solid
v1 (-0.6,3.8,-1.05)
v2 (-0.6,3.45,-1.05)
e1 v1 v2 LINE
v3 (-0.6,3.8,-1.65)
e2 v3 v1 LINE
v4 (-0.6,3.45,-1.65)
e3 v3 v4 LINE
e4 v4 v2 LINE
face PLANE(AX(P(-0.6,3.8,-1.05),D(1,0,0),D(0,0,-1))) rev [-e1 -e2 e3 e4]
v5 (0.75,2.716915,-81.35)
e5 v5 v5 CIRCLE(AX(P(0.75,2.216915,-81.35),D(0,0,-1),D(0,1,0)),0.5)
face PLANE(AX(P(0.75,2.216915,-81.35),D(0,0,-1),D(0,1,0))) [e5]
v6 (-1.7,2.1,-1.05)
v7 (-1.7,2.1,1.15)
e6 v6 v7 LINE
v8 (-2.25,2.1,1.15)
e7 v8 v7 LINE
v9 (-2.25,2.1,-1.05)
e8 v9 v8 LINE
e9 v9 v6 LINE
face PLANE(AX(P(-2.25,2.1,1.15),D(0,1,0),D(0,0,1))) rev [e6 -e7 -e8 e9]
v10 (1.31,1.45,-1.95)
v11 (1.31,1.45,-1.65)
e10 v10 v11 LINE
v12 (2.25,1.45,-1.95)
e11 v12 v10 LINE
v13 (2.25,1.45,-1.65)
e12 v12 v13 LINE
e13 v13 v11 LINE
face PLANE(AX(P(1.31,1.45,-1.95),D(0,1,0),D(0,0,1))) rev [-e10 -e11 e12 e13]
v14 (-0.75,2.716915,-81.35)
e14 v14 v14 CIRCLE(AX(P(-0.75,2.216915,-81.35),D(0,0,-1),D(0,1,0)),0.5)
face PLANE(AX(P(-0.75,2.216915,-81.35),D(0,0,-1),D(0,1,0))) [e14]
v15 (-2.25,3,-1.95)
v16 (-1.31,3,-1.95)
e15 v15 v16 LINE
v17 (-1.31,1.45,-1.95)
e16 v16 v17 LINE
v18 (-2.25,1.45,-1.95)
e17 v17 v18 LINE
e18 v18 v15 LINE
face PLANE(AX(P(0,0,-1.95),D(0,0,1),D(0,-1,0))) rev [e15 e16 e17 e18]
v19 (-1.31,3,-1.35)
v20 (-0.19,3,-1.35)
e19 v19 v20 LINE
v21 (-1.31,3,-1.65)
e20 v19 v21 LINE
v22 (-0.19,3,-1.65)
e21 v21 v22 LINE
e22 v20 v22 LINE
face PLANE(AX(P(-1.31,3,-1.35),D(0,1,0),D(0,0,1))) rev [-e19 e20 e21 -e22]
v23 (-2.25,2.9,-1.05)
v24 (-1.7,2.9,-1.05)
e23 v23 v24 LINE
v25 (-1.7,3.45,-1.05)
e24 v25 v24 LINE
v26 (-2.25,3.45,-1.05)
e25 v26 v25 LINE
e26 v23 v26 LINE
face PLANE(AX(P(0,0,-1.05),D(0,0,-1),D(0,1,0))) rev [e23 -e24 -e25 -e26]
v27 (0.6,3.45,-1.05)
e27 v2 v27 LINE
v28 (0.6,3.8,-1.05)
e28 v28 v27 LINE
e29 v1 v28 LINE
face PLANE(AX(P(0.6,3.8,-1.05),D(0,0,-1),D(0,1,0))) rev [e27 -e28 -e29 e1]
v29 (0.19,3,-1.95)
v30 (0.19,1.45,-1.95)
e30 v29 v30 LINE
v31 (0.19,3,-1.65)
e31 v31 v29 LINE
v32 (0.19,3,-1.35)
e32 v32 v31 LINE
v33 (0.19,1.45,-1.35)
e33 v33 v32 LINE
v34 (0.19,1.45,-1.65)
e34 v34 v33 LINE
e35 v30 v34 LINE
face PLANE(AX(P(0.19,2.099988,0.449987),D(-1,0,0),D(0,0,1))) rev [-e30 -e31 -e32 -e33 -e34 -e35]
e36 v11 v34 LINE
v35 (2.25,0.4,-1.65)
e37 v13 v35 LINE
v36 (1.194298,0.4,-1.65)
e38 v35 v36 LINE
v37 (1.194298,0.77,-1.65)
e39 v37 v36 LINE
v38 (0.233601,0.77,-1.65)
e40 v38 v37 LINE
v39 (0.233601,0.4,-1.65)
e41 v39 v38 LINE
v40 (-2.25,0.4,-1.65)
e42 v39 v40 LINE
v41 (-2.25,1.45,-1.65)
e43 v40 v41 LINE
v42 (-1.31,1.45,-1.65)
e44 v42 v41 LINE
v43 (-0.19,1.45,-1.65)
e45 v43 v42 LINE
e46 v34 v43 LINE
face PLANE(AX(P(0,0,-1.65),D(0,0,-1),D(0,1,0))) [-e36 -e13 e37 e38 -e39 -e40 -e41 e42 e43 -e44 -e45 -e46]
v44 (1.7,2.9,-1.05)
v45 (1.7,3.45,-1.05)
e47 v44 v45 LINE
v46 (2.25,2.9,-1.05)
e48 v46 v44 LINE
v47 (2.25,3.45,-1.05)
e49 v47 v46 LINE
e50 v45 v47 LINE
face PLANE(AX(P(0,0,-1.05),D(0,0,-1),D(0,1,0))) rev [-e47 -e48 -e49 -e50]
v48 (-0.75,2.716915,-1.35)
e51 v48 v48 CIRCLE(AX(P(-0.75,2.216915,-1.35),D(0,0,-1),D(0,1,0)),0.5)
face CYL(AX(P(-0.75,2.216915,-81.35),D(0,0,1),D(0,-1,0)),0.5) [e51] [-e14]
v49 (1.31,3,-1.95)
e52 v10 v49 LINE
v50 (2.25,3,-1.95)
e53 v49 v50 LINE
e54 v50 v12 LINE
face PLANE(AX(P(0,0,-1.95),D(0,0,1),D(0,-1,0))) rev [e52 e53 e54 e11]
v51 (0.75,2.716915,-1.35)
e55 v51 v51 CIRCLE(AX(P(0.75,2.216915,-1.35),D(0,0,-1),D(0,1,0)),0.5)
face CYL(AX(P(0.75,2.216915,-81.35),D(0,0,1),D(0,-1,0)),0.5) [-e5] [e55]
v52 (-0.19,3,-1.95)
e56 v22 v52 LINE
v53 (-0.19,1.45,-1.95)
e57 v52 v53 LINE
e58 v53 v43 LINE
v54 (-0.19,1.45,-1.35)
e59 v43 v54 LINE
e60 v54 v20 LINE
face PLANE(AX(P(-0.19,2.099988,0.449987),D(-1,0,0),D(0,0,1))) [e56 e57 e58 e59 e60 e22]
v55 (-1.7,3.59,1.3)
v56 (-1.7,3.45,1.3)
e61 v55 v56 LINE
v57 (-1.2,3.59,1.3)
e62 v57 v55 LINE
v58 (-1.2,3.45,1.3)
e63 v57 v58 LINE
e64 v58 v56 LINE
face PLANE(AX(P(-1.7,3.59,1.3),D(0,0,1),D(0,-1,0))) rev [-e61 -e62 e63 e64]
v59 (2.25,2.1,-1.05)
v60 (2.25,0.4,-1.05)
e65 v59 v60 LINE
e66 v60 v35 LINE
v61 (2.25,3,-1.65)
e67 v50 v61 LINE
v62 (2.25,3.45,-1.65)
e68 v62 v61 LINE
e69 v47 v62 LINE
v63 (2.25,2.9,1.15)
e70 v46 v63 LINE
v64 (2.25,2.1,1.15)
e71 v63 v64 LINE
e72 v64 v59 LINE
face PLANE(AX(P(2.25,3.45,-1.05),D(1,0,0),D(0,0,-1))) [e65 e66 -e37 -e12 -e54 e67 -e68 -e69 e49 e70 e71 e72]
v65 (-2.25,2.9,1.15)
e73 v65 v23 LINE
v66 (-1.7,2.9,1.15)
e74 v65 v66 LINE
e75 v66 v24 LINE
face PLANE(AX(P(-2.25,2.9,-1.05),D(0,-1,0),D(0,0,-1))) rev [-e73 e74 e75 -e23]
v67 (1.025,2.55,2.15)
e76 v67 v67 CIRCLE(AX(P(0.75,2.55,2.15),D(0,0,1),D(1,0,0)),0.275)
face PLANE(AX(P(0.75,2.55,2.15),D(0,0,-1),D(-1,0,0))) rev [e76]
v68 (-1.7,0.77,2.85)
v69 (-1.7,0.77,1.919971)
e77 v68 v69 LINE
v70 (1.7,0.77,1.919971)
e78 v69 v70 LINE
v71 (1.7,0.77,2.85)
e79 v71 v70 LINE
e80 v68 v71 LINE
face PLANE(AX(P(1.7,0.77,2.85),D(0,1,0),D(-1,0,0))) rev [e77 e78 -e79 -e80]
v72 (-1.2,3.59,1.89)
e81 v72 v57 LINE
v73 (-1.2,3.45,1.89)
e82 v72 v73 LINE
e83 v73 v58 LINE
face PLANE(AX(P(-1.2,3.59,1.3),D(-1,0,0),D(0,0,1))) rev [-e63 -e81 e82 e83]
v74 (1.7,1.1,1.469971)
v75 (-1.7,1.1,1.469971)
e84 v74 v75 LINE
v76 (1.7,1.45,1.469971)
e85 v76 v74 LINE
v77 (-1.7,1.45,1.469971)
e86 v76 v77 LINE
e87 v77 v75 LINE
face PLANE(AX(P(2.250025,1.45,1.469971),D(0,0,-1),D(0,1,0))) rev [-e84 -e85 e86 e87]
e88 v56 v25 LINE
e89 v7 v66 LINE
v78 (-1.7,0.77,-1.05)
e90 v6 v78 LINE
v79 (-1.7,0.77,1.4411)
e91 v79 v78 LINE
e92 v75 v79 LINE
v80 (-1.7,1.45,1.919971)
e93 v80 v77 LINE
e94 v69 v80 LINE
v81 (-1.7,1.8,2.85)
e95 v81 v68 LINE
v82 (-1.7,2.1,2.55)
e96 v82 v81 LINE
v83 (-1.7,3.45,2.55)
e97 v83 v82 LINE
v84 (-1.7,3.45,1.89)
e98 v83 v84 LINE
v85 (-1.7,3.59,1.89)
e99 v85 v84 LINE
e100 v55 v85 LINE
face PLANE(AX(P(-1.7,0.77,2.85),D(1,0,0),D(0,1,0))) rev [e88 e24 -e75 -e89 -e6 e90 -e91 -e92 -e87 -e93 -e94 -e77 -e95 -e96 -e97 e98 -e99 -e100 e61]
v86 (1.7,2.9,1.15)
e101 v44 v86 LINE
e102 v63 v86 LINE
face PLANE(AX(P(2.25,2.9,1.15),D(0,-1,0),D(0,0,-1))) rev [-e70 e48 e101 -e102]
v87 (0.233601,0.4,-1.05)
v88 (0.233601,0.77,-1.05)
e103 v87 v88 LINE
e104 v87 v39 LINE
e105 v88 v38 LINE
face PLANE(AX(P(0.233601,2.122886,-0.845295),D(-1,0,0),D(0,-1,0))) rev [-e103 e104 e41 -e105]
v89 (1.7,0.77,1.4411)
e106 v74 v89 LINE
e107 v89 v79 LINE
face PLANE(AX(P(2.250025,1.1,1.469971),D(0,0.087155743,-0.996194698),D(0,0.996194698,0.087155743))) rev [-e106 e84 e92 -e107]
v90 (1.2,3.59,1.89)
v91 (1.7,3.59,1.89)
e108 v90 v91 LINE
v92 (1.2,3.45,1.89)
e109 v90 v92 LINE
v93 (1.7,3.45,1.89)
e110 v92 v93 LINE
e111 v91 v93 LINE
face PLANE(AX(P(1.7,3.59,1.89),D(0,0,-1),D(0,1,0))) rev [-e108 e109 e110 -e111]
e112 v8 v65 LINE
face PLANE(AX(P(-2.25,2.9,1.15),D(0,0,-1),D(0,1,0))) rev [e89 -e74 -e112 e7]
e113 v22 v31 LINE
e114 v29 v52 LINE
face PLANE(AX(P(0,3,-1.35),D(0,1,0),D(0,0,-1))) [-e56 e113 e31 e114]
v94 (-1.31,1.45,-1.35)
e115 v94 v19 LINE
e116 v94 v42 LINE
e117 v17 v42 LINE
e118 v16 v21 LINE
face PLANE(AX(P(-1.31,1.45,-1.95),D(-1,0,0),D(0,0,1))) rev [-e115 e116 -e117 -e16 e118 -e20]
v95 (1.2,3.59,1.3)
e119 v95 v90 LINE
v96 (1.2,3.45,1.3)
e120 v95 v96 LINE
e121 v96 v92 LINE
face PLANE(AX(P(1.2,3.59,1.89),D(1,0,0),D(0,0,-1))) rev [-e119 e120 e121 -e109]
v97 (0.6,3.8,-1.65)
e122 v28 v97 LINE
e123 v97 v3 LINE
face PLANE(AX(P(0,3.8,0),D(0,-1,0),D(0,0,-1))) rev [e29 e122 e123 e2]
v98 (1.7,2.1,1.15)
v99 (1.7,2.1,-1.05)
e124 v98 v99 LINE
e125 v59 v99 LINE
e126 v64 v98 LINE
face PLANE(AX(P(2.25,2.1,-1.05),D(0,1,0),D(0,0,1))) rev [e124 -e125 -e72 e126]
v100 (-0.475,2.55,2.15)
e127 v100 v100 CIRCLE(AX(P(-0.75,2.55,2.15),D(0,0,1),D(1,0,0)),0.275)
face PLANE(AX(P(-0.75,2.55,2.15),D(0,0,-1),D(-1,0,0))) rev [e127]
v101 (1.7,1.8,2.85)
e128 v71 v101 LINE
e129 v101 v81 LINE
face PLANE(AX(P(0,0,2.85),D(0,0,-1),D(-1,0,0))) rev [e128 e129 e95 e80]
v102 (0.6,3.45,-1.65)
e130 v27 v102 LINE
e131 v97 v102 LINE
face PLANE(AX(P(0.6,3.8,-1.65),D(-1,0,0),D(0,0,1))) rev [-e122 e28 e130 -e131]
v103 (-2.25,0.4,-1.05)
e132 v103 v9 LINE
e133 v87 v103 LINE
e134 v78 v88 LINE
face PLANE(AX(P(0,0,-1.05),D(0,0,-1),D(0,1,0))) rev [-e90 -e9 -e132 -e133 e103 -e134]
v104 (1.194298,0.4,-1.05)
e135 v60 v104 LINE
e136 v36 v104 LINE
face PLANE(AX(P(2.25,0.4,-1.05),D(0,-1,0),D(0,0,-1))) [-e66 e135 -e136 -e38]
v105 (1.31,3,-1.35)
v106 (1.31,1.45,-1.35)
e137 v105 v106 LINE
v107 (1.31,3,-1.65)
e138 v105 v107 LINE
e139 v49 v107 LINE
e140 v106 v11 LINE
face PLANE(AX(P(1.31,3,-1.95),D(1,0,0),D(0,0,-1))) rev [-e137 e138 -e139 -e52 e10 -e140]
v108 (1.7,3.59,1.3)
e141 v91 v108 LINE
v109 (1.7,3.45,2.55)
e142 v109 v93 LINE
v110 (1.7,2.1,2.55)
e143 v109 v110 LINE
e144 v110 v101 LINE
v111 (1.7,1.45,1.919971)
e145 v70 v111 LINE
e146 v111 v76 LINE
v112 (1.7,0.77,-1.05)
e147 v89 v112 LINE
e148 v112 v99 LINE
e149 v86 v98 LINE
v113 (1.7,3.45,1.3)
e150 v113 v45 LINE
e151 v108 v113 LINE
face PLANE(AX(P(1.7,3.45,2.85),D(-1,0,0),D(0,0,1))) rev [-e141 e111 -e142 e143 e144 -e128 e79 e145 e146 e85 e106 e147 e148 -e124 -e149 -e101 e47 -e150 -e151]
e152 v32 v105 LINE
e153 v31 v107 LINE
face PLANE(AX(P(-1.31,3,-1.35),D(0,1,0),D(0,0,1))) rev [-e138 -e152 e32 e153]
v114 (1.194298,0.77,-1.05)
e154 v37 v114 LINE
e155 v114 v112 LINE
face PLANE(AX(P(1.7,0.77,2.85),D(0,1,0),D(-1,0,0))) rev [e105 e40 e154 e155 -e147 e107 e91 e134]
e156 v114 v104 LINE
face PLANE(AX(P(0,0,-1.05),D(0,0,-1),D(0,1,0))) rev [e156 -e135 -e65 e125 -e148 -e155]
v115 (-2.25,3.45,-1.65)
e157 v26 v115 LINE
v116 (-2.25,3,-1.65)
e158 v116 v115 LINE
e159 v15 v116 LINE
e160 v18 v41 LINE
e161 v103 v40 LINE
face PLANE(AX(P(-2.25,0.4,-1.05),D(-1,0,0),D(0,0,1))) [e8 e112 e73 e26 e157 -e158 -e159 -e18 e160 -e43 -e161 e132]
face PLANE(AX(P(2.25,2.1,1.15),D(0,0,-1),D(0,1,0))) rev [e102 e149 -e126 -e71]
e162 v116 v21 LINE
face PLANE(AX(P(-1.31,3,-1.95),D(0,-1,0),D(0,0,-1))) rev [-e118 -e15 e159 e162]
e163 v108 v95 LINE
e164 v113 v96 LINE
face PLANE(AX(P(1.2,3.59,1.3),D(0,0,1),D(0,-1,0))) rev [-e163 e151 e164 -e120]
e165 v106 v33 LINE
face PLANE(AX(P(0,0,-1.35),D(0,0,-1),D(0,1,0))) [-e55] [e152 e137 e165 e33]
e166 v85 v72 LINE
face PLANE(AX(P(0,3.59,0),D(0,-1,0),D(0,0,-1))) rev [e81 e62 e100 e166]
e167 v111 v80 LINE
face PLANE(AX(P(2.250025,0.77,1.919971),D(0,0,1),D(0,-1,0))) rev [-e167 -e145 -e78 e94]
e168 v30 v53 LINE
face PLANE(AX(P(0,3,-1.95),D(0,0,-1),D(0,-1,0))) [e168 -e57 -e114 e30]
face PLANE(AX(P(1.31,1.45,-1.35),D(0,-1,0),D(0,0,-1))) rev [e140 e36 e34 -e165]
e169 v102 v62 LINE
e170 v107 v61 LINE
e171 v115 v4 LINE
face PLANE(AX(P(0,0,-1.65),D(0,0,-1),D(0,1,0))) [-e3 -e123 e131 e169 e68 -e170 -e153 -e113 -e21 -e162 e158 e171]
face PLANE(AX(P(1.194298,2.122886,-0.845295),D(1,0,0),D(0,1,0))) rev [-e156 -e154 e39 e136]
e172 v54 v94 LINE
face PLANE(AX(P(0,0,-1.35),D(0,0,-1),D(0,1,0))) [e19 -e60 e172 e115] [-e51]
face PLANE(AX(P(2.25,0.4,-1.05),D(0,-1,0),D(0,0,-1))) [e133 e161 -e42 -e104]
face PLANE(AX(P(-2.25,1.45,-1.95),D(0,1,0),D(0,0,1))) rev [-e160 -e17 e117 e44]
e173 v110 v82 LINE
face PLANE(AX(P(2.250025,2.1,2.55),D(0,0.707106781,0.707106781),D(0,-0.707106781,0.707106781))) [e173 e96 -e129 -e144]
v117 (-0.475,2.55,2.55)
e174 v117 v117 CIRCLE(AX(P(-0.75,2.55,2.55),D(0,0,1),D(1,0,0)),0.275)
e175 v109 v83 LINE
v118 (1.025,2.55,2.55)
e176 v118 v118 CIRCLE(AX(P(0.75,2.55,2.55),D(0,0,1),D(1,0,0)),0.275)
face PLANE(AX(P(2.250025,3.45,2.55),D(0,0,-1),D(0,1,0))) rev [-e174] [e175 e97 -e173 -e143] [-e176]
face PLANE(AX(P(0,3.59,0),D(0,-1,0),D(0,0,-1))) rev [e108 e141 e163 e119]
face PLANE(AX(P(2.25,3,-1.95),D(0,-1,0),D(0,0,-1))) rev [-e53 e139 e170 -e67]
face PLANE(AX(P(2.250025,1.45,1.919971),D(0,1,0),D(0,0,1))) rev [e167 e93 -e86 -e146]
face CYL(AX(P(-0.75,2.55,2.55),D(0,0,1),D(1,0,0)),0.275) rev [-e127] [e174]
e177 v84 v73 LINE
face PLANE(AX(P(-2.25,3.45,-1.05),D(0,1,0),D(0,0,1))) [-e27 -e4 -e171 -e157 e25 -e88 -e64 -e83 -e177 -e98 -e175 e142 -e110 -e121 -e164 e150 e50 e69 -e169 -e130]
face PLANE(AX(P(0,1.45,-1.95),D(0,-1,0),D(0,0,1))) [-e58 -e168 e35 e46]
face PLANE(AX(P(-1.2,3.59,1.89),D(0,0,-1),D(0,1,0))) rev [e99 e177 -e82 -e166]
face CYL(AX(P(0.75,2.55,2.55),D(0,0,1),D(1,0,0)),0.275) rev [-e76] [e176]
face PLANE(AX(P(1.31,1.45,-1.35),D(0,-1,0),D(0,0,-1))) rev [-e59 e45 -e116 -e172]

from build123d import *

# Parameters (mm, degrees)
SKETCH1_W                        = 4.5
SKETCH1_H                        = 3.05
BOSS_EXTRUDE1_DEPTH              = 0.6
SKETCH2_W                        = 0.94
SKETCH2_H                        = 1.55
BOSS_EXTRUDE2_DEPTH              = 0.3
SKETCH3_W                        = 0.94
SKETCH3_H                        = 1.55
BOSS_EXTRUDE3_DEPTH              = 0.3
SKETCH4_W                        = 2.62
SKETCH4_H                        = 1.55
CUT_EXTRUDE1_DEPTH               = 0.3
SKETCH5_W                        = 3.4
SKETCH5_H                        = 2.68
BOSS_EXTRUDE4_DEPTH              = 3.9
SKETCH6_W                        = 2.2
SKETCH6_H                        = 0.8
BOSS_EXTRUDE5_DEPTH              = 0.55
SKETCH7_W                        = 2.2
SKETCH7_H                        = 0.8
BOSS_EXTRUDE6_DEPTH              = 0.55
SKETCH8_W                        = 0.3
SKETCH8_H                        = 1.35
CUT_EXTRUDE2_DEPTH               = 6.968877616
CUT_EXTRUDE3_DEPTH               = 6.968877616
SKETCH10_W                       = 0.5
SKETCH10_H                       = 0.59
BOSS_EXTRUDE7_DEPTH              = 0.14
SKETCH11_W                       = 1.2
SKETCH11_H                       = 0.6
BOSS_EXTRUDE8_DEPTH              = 0.35
SKETCH12_W                       = 0.5
SKETCH12_H                       = 0.59
BOSS_EXTRUDE9_DEPTH              = 0.14
DRAFT1_ANGLE                     = 45
F_0_55_0_55_DIAMETER_HOLE1_D     = 0.55
F_0_55_0_55_DIAMETER_HOLE1_DEPTH = 0.4
RIB1_START                       = -0.19
RIB1_OUTLINE_W                   = 1.55
RIB1_OUTLINE_H                   = 0.6
RIB1_DEPTH                       = 0.38
SKETCH16_R                       = 0.5
BOSS_EXTRUDE10_DEPTH             = 80
SKETCH17_W                       = 0.960697218
SKETCH17_H                       = 0.952555717
CUT_EXTRUDE4_DEPTH               = 0.37


# Read off the part's stored shape, not the designer's step: Rib1
with BuildPart() as part:
    # Sketch1 → Boss-Extrude1 (new body)
    with BuildSketch(Plane(origin=(0, 0, -1.65), x_dir=(-1, 0, 0), z_dir=(0, 0, -1))):
        with Locations((0, 1.925)):
            Rectangle(SKETCH1_W, SKETCH1_H)
    extrude(amount=-BOSS_EXTRUDE1_DEPTH)

    # Sketch2 → Boss-Extrude2 (add)
    with BuildSketch(Plane(origin=(0, 0, -1.65), x_dir=(-1, 0, 0), z_dir=(0, 0, -1))):
        with Locations((1.78, 2.225)):
            Rectangle(SKETCH2_W, SKETCH2_H)
    extrude(amount=BOSS_EXTRUDE2_DEPTH)

    # Sketch3 → Boss-Extrude3 (add)
    with BuildSketch(Plane(origin=(0, 0, -1.65), x_dir=(-1, 0, 0), z_dir=(0, 0, -1))):
        with Locations((-1.78, 2.225)):
            Rectangle(SKETCH3_W, SKETCH3_H)
    extrude(amount=BOSS_EXTRUDE3_DEPTH)

    # Sketch4 → Cut-Extrude1 (cut)
    with BuildSketch(Plane(origin=(0, 0, -1.65), x_dir=(-1, 0, 0), z_dir=(0, 0, -1))):
        with Locations((0, 2.225)):
            Rectangle(SKETCH4_W, SKETCH4_H)
    extrude(amount=-CUT_EXTRUDE1_DEPTH, mode=Mode.SUBTRACT)

    # Sketch5 → Boss-Extrude4 (add)
    with BuildSketch(Plane.XY.offset(-1.05)):
        with Locations((0, 2.11)):
            Rectangle(SKETCH5_W, SKETCH5_H)
    extrude(amount=BOSS_EXTRUDE4_DEPTH)

    # Sketch6 → Boss-Extrude5 (add)
    with BuildSketch(Plane(origin=(1.7, 0, 0), x_dir=(0, 0, -1), z_dir=(1, 0, 0))):
        with Locations((-0.05, 2.5)):
            Rectangle(SKETCH6_W, SKETCH6_H)
    extrude(amount=BOSS_EXTRUDE5_DEPTH)

    # Sketch7 → Boss-Extrude6 (add)
    with BuildSketch(Plane.ZY.offset(1.7)):
        with Locations((0.05, 2.5)):
            Rectangle(SKETCH7_W, SKETCH7_H)
    extrude(amount=BOSS_EXTRUDE6_DEPTH)

    # Sketch8 → Cut-Extrude2 (cut, through all)
    with BuildSketch(Plane.ZY.offset(1.7)):
        with Locations((2.7, 2.775)):
            Rectangle(SKETCH8_W, SKETCH8_H)
    extrude(amount=-CUT_EXTRUDE2_DEPTH, mode=Mode.SUBTRACT)

    # Sketch9 → Cut-Extrude3 (cut, through all)
    with BuildSketch(Plane.ZY.offset(1.7)):
        Polygon((1.4411, 0.77), (1.919971259, 0.77), (1.919971259, 1.45), (1.469971259, 1.45), (1.469971259, 1.1), align=None)
    extrude(amount=-CUT_EXTRUDE3_DEPTH, mode=Mode.SUBTRACT)

    # Sketch10 → Boss-Extrude7 (add)
    with BuildSketch(Plane(origin=(0, 3.45, 0), x_dir=(-1, 0, 0), z_dir=(0, 1, 0))):
        with Locations((1.45, 1.595)):
            Rectangle(SKETCH10_W, SKETCH10_H)
    extrude(amount=BOSS_EXTRUDE7_DEPTH)

    # Sketch11 → Boss-Extrude8 (add)
    with BuildSketch(Plane(origin=(0, 3.45, 0), x_dir=(-1, 0, 0), z_dir=(0, 1, 0))):
        with Locations((0, -1.35)):
            Rectangle(SKETCH11_W, SKETCH11_H)
    extrude(amount=BOSS_EXTRUDE8_DEPTH)

    # Sketch12 → Boss-Extrude9 (add)
    with BuildSketch(Plane(origin=(0, 3.45, 0), x_dir=(-1, 0, 0), z_dir=(0, 1, 0))):
        with Locations((-1.45, 1.595)):
            Rectangle(SKETCH12_W, SKETCH12_H)
    extrude(amount=BOSS_EXTRUDE9_DEPTH)

    # Draft1
    draft1_faces = [part.faces().sort_by_distance(p)[0] for p in [
        (0, 2.1, 2.7),
    ]]
    draft(draft1_faces, Plane(origin=(2.250025, 3.45, 2.55), x_dir=(0, 1, 0), z_dir=(0, 0, 1)), DRAFT1_ANGLE)

    # Ø0.55 (0.55) Diameter Hole1
    with Locations(Plane.XY.offset(2.55)):
        with Locations((-0.75, 2.55), (0.75, 2.55)):
            Hole(F_0_55_0_55_DIAMETER_HOLE1_D / 2, depth=F_0_55_0_55_DIAMETER_HOLE1_DEPTH)

    # Rib1 outline → Rib1 (add)
    with BuildSketch(Plane(origin=(0, 0, 0), x_dir=(0, -1, 0), z_dir=(-1, 0, 0)).offset(RIB1_START)):
        with Locations((-2.225, -1.65)):
            Rectangle(RIB1_OUTLINE_W, RIB1_OUTLINE_H)
    extrude(amount=RIB1_DEPTH)

    # Sketch16 → Boss-Extrude10 (add)
    with BuildSketch(Plane(origin=(0, 0, -1.35), x_dir=(-1, 0, 0), z_dir=(0, 0, -1))):
        with Locations(Location((-0.75, 2.216914792, 0), (0, 0, 90))):
            Circle(SKETCH16_R)
        with Locations(Location((0.75, 2.216914792, 0), (0, 0, 90))):
            Circle(SKETCH16_R)
    extrude(amount=BOSS_EXTRUDE10_DEPTH)

    # Sketch17 → Cut-Extrude4 (cut)
    with BuildSketch(Plane.XZ.offset(-0.4)):
        with Locations((0.713949263, -1.321573248)):
            Rectangle(SKETCH17_W, SKETCH17_H)
    extrude(amount=-CUT_EXTRUDE4_DEPTH, mode=Mode.SUBTRACT)


solid = part.part
